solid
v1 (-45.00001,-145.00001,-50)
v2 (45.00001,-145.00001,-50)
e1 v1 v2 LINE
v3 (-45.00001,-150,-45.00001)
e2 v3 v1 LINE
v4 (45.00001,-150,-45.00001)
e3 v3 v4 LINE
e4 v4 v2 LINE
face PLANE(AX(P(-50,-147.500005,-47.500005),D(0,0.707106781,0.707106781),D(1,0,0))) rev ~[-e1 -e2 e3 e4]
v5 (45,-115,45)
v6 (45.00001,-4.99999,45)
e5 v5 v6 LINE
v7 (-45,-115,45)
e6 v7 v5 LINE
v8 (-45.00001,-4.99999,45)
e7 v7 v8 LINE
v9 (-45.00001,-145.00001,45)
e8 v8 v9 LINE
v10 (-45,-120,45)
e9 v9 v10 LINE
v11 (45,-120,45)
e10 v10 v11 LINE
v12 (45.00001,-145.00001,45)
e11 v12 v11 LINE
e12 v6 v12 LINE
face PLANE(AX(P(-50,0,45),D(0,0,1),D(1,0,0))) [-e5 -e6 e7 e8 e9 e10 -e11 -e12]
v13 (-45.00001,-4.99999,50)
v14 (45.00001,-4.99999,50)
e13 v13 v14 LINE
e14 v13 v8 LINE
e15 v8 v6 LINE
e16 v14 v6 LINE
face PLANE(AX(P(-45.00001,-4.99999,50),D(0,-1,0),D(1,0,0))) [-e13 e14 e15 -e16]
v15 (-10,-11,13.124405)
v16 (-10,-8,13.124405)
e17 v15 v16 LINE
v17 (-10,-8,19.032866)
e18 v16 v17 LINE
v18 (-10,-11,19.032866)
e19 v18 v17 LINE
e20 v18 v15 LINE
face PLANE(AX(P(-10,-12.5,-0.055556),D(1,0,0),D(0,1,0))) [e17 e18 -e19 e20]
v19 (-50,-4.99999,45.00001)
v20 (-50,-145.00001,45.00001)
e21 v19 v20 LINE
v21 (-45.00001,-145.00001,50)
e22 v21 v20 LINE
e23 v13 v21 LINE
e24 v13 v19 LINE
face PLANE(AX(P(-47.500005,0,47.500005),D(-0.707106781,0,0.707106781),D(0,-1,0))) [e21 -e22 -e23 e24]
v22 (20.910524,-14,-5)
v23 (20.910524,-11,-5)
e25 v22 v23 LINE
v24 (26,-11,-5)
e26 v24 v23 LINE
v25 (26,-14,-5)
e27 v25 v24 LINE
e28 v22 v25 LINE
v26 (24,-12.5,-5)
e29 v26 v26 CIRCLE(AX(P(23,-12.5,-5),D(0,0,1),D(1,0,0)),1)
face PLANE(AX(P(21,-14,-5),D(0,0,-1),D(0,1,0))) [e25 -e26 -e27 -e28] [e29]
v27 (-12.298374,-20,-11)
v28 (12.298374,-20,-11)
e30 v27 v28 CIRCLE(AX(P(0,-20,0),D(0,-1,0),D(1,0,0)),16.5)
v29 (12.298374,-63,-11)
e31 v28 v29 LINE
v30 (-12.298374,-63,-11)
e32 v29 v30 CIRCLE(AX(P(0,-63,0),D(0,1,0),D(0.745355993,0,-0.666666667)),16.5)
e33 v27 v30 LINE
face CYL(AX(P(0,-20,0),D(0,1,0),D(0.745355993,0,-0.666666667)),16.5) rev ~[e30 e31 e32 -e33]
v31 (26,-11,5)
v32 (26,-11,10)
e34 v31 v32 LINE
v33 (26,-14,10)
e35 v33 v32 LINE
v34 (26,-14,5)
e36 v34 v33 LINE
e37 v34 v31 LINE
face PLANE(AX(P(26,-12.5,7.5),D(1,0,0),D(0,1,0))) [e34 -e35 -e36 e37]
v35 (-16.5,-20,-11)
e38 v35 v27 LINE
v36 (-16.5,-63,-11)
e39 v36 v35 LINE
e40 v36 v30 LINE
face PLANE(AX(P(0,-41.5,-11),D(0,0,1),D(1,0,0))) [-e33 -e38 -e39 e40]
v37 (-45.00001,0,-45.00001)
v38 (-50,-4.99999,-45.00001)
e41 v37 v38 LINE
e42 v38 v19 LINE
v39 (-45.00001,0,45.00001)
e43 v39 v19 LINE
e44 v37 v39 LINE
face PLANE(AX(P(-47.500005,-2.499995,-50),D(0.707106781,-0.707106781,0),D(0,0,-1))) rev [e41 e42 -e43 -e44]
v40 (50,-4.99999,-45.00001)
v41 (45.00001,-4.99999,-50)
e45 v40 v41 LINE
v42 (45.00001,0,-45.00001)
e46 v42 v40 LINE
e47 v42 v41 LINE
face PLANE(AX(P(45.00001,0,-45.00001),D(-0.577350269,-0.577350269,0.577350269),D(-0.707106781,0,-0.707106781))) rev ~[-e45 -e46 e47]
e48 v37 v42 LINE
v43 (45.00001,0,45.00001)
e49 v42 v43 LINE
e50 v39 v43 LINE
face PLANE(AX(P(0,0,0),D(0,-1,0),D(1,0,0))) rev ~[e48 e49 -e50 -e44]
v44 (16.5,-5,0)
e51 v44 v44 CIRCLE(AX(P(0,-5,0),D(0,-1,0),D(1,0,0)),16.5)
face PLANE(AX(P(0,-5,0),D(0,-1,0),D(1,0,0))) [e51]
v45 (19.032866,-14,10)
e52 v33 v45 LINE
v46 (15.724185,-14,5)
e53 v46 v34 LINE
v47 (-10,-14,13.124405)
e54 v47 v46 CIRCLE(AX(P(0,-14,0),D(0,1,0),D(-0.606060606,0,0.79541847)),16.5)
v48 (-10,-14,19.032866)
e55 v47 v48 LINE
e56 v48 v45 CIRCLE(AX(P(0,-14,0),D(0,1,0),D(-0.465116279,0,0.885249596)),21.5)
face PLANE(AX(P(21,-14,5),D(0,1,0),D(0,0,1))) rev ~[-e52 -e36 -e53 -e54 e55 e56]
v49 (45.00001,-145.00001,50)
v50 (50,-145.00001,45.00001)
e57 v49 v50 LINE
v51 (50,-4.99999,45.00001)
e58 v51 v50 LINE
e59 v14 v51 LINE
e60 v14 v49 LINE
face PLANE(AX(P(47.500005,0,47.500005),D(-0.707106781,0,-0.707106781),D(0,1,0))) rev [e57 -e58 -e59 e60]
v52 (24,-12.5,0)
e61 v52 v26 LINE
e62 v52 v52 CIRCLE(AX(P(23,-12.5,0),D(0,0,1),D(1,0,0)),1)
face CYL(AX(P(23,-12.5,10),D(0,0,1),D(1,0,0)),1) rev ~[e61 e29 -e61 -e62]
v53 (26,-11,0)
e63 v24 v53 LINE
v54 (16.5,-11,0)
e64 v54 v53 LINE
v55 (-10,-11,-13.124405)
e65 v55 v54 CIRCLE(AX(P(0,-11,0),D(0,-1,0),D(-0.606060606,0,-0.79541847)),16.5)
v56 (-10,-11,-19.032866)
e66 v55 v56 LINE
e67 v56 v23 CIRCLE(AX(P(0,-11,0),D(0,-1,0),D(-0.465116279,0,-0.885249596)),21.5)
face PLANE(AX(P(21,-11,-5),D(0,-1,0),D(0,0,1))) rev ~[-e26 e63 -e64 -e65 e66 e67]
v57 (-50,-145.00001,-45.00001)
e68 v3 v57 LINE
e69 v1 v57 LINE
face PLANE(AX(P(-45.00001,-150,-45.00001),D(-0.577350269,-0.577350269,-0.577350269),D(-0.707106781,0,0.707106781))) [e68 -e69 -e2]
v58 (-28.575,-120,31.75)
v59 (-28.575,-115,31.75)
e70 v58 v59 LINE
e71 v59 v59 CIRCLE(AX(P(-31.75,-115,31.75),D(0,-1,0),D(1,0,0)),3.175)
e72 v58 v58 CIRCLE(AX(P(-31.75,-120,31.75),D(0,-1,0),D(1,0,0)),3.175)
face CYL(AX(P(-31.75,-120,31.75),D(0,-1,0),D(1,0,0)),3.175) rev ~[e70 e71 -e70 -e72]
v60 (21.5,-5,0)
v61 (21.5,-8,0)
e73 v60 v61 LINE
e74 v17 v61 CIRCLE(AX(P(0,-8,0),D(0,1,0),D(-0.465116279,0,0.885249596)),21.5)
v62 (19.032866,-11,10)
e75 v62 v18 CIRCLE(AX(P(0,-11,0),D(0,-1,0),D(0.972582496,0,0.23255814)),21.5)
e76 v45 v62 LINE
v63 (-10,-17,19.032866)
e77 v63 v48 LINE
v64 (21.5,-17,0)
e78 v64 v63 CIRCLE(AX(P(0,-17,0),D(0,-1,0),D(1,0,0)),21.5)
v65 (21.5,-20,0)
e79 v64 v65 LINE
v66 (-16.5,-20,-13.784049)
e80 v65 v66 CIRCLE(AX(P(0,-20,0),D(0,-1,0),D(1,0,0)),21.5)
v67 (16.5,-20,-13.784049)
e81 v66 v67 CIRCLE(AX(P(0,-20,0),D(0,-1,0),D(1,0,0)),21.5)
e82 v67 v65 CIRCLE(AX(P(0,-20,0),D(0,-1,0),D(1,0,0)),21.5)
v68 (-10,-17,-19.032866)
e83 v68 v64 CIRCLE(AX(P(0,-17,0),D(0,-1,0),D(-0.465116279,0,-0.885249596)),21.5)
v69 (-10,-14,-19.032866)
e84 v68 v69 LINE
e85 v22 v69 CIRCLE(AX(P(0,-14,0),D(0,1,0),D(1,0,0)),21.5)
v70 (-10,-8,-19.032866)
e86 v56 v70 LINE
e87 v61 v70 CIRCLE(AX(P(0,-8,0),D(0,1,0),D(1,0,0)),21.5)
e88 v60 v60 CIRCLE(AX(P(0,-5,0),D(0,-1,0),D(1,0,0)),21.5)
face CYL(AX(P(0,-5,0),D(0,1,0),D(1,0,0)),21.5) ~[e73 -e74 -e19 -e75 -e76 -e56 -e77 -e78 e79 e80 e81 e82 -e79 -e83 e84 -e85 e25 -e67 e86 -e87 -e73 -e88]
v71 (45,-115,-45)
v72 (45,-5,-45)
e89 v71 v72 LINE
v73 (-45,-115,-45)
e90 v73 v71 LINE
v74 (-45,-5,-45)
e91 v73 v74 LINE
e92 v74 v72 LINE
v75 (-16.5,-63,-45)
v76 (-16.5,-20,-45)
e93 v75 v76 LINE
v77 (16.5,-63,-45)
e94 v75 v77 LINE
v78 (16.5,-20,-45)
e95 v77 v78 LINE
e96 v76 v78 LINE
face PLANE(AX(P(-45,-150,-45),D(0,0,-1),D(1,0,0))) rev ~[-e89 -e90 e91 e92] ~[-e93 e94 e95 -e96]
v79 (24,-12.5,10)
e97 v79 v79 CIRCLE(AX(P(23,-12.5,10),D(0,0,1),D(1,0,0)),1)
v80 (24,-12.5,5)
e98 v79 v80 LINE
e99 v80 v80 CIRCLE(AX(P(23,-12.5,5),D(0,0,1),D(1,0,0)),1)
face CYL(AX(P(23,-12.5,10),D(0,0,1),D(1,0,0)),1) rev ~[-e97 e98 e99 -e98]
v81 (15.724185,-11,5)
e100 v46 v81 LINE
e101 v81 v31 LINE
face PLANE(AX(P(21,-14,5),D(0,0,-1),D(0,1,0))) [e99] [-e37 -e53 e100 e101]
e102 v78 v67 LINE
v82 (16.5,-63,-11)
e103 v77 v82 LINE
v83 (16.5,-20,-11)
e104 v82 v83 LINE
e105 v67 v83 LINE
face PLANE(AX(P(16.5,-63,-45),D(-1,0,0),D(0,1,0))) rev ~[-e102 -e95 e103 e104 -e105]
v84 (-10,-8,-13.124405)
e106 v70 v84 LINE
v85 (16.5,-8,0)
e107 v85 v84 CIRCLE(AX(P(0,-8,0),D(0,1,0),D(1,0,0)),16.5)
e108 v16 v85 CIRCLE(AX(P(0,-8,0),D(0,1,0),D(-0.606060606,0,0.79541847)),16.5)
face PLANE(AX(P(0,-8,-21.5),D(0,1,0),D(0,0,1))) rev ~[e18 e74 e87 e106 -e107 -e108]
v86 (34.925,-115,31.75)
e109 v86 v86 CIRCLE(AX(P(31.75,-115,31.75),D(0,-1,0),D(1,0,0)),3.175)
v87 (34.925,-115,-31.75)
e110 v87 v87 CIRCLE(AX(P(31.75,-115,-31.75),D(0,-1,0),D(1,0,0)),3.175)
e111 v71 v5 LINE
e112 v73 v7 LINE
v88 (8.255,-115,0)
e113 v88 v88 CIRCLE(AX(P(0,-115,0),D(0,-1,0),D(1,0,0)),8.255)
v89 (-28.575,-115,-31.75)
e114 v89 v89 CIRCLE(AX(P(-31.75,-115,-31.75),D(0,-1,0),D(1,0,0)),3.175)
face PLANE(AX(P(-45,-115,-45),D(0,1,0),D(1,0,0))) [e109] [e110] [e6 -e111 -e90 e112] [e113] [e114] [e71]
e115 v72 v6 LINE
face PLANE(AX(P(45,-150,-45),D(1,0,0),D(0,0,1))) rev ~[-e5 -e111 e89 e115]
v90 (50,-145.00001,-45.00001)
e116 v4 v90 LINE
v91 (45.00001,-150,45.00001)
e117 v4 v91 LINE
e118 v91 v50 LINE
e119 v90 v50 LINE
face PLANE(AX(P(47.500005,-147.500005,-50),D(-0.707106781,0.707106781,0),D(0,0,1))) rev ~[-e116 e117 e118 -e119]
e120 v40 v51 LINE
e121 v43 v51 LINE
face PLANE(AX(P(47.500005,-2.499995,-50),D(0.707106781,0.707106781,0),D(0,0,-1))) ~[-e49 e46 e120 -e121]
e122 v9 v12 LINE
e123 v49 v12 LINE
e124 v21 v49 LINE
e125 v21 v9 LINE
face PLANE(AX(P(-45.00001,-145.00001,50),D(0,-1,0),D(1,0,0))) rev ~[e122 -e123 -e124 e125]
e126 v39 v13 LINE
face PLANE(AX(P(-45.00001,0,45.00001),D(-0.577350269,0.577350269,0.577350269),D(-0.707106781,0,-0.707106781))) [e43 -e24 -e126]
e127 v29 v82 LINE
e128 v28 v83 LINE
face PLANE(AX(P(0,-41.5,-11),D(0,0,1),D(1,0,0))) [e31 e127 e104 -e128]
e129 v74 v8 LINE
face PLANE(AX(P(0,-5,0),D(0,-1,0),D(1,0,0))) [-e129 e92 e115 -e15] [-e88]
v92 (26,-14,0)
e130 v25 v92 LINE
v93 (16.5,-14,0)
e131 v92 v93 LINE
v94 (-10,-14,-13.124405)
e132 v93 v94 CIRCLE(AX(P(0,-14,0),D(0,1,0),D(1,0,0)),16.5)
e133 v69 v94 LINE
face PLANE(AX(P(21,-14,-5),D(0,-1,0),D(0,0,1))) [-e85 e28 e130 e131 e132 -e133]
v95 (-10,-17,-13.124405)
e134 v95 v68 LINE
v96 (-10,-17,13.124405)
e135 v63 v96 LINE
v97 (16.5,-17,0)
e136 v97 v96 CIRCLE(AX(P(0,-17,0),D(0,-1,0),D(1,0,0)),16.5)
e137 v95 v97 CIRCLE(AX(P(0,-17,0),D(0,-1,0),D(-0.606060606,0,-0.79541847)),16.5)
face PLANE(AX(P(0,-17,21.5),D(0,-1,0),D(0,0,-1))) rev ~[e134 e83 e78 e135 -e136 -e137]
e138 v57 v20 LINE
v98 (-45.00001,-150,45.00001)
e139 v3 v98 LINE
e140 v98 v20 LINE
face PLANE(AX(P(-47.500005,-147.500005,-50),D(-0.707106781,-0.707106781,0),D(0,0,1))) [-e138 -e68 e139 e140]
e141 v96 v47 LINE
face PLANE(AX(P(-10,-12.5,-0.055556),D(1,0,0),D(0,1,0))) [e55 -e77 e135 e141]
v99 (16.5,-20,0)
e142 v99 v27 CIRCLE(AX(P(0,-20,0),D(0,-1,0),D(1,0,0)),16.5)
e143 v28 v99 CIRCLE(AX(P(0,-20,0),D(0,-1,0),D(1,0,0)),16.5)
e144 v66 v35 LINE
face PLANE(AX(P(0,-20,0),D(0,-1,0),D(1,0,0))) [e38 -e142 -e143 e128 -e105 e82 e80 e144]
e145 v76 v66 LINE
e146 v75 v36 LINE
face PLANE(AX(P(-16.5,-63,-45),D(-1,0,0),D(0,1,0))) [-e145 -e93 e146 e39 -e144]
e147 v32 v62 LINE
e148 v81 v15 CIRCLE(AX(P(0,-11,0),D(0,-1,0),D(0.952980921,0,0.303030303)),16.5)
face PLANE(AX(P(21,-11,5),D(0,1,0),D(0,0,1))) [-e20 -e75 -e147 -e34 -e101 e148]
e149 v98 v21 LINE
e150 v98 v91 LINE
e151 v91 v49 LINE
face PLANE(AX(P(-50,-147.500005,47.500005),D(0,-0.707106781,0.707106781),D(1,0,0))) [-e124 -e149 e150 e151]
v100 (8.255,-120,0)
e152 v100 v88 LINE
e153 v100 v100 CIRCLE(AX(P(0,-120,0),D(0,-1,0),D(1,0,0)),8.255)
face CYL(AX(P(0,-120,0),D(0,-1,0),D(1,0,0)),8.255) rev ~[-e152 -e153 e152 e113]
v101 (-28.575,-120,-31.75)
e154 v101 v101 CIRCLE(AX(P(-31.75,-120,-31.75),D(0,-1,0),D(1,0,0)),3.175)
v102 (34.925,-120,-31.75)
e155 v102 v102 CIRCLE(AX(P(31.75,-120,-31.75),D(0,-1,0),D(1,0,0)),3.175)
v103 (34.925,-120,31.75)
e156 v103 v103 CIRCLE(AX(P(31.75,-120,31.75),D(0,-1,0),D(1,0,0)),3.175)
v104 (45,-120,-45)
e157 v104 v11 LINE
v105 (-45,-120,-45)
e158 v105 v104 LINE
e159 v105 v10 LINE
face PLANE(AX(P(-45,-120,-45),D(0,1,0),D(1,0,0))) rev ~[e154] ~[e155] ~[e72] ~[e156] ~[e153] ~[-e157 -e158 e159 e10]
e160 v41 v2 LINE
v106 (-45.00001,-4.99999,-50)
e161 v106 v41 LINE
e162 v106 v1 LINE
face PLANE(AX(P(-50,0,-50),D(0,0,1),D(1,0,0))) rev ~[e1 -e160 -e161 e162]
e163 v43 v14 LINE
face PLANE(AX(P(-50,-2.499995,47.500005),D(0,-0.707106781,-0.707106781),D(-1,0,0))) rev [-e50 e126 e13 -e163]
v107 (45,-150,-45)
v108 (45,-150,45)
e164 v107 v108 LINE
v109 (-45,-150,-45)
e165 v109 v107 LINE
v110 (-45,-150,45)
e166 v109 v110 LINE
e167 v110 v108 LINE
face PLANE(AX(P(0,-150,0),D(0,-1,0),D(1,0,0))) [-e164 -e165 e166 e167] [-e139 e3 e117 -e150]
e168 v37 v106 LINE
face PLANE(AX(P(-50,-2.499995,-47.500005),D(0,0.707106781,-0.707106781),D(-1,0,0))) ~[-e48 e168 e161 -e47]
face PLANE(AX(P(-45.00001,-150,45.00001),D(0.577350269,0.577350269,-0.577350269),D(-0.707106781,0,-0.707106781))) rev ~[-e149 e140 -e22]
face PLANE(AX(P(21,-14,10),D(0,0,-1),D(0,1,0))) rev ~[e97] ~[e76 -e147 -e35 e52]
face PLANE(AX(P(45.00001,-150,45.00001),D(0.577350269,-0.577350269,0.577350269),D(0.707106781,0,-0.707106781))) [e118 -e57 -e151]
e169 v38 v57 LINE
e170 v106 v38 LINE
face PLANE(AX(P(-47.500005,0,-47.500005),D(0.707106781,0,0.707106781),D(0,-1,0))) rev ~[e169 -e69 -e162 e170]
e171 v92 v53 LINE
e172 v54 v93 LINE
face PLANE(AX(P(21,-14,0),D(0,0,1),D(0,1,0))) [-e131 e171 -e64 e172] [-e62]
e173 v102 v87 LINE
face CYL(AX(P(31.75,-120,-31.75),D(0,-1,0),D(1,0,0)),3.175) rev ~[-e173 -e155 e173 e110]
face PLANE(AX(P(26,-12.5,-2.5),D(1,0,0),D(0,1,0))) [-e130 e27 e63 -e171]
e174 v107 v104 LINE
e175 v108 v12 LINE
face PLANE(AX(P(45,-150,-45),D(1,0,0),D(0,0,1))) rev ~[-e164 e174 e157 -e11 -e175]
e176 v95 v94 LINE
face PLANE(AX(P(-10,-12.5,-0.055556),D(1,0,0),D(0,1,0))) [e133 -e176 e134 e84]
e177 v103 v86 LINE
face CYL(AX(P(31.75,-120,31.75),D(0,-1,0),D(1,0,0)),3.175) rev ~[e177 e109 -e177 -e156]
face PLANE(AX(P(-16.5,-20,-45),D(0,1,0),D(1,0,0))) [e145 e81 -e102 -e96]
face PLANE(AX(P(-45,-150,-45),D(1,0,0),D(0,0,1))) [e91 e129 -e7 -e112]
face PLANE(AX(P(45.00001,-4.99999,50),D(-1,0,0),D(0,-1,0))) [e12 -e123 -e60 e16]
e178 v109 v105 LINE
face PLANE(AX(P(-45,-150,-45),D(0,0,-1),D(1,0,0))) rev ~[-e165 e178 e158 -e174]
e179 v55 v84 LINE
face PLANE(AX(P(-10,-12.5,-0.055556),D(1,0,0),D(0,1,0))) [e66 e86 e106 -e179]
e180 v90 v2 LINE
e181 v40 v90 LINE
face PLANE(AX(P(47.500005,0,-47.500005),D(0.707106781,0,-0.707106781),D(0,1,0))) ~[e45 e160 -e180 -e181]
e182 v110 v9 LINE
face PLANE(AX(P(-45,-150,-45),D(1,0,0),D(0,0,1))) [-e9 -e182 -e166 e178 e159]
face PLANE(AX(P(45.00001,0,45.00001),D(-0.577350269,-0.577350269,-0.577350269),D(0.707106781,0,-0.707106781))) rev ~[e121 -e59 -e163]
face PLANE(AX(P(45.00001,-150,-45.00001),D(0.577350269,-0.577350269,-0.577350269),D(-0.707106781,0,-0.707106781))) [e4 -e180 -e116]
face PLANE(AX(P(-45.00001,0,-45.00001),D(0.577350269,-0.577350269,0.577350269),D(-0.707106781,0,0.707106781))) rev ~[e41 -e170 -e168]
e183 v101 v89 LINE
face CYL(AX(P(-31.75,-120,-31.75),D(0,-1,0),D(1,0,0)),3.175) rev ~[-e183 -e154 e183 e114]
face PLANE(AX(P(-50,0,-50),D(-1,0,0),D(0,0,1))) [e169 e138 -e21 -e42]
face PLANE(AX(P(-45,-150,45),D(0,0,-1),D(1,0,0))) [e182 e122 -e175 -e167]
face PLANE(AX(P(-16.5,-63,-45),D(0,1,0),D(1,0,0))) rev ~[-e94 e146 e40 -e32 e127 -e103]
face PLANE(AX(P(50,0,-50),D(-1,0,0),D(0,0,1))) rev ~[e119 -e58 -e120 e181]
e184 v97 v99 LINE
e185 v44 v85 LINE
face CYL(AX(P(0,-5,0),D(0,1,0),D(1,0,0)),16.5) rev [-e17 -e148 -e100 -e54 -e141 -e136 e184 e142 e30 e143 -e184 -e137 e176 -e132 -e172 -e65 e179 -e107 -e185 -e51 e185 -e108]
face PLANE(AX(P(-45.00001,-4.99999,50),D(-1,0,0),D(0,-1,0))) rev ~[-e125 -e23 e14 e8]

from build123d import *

# Parameters (mm, degrees)
F0_W           = 100
F0_H           = 100
F1_DEPTH       = 150
F2_W           = 90
F2_H           = 90
F3_DEPTH       = 145
F5_R           = 21.5
F5_R_2         = 16.5
F6_DEPTH       = 15
F8_DEPTH       = 21.7
F8_DEPTH_BACK  = 10
F10_W          = 3
F10_H          = 5
F11_DEPTH      = 5
F11_DEPTH_BACK = 4
F12_R          = 1
F13_DEPTH      = 15
F14_W          = 33
F14_H          = 43
F15_DEPTH      = 34
F17_DEPTH      = 130.001
F18_SIZE       = 4.99999
F19_W          = 90
F19_H          = 5
F20_DEPTH      = 90
F21_R          = 8.255
F22_DEPTH      = 5
F23_R          = 3.175
F24_DEPTH      = 5
F25_DEPTH      = 5


# Not quite as in the source:
# - a fillet or chamfer is up to 0.001 mm smaller than in the source, because OpenCascade refuses the exact size


with BuildPart() as f1:
    # F0 (on Front) → F1 (new body)
    with BuildSketch(Plane.XZ):
        Rectangle(F0_W, F0_H)
    extrude(amount=F1_DEPTH)

    # F2 (on face) → F3 (cut)
    with BuildSketch(Plane.XZ.offset(150)):
        Rectangle(F2_W, F2_H)
    extrude(amount=-F3_DEPTH, mode=Mode.SUBTRACT)

    # F5 (on face) → F6 (join)
    with BuildSketch(Plane.XZ.offset(5)):
        Circle(F5_R)
        Circle(F5_R_2, mode=Mode.SUBTRACT)
    extrude(amount=F6_DEPTH)

    # F7 (on Right) → F8 (cut, two sides)
    with BuildSketch(Plane.YZ) as f8_sk:
        Polygon((-8, 21.5), (-11, 21.5), (-11, 5), (-14, 5), (-14, 21.5), (-17, 21.5), (-17, -21.5), (-14, -21.5), (-14, 0), (-11, 0), (-11, -21.5), (-8, -21.5), align=None)
    extrude(amount=F8_DEPTH, mode=Mode.SUBTRACT)
    extrude(f8_sk.sketch, amount=-F8_DEPTH_BACK, mode=Mode.SUBTRACT)

    # F10 (on offset) → F11 (join, two sides)
    with BuildSketch(Plane.YZ.offset(21)) as f11_sk:
        with Locations((-12.5, 7.5)):
            Rectangle(F10_W, F10_H)
        with Locations((-12.5, -2.5)):
            Rectangle(F10_W, F10_H)
    extrude(amount=F11_DEPTH)
    extrude(f11_sk.sketch, amount=-F11_DEPTH_BACK)

    # F12 (on face) → F13 (cut, through all)
    with BuildSketch(Plane.XY.offset(10)):
        with Locations((23, -12.5)):
            Circle(F12_R)
    extrude(amount=-F13_DEPTH, mode=Mode.SUBTRACT)

    # F14 (on face) → F15 (join)
    with BuildSketch(Plane.XY.offset(-45)):
        with Locations((0, -41.5)):
            Rectangle(F14_W, F14_H)
    extrude(amount=F15_DEPTH)

    # F16 (on face) → F17 (cut, through all)
    with BuildSketch(Plane(origin=(0, -20, 0), x_dir=(-1, 0, 0), z_dir=(0, 1, 0))):
        with BuildLine():
            Line((12.2983738762, -11), (-12.2983738762, -11))
            ThreePointArc((-12.2983738762, -11), (0, -16.5), (12.2983738762, -11))
        make_face()
    extrude(amount=-F17_DEPTH, mode=Mode.SUBTRACT)

    # F18 (size 5 in the source; OpenCascade refuses exactly that, so slightly less here)
    f18_edges = [f1.edges().sort_by_distance(p)[0] for p in [
        (50, -75, 50),
        (-50, -75, 50),
        (0, 0, 50),
        (0, -150, 50),
        (50, -75, -50),
        (50, 0, 0),
        (50, -150, 0),
        (-50, -75, -50),
        (0, 0, -50),
        (0, -150, -50),
        (-50, 0, 0),
        (-50, -150, 0),
    ]]
    chamfer(f18_edges, length=F18_SIZE)

    # F19 (on face) → F20 (join, through all)
    with BuildSketch(Plane.XY.offset(-45)):
        with Locations((0, -117.5)):
            Rectangle(F19_W, F19_H)
    extrude(amount=F20_DEPTH)

    # F21 (on face) → F22 (cut)
    with BuildSketch(Plane.XZ.offset(120)):
        Circle(F21_R)
    extrude(amount=-F22_DEPTH, mode=Mode.SUBTRACT)

    # F23 (on face) → F24 (cut)
    with BuildSketch(Plane.XZ.offset(120)):
        with Locations((-31.75, 31.75)):
            Circle(F23_R)
        with Locations((-31.75, -31.75)):
            Circle(F23_R)
        with Locations((31.75, 31.75)):
            Circle(F23_R)
        with Locations((31.75, -31.75)):
            Circle(F23_R)
    extrude(amount=-F24_DEPTH, mode=Mode.SUBTRACT)

    # F25 (cut, through all): a face of the model
    f25_faces = [f1.faces().sort_by_distance(p)[0] for p in [
        (0, -75, 50),
    ]]
    extrude(f25_faces, amount=-F25_DEPTH, mode=Mode.SUBTRACT)


solid = f1.part
